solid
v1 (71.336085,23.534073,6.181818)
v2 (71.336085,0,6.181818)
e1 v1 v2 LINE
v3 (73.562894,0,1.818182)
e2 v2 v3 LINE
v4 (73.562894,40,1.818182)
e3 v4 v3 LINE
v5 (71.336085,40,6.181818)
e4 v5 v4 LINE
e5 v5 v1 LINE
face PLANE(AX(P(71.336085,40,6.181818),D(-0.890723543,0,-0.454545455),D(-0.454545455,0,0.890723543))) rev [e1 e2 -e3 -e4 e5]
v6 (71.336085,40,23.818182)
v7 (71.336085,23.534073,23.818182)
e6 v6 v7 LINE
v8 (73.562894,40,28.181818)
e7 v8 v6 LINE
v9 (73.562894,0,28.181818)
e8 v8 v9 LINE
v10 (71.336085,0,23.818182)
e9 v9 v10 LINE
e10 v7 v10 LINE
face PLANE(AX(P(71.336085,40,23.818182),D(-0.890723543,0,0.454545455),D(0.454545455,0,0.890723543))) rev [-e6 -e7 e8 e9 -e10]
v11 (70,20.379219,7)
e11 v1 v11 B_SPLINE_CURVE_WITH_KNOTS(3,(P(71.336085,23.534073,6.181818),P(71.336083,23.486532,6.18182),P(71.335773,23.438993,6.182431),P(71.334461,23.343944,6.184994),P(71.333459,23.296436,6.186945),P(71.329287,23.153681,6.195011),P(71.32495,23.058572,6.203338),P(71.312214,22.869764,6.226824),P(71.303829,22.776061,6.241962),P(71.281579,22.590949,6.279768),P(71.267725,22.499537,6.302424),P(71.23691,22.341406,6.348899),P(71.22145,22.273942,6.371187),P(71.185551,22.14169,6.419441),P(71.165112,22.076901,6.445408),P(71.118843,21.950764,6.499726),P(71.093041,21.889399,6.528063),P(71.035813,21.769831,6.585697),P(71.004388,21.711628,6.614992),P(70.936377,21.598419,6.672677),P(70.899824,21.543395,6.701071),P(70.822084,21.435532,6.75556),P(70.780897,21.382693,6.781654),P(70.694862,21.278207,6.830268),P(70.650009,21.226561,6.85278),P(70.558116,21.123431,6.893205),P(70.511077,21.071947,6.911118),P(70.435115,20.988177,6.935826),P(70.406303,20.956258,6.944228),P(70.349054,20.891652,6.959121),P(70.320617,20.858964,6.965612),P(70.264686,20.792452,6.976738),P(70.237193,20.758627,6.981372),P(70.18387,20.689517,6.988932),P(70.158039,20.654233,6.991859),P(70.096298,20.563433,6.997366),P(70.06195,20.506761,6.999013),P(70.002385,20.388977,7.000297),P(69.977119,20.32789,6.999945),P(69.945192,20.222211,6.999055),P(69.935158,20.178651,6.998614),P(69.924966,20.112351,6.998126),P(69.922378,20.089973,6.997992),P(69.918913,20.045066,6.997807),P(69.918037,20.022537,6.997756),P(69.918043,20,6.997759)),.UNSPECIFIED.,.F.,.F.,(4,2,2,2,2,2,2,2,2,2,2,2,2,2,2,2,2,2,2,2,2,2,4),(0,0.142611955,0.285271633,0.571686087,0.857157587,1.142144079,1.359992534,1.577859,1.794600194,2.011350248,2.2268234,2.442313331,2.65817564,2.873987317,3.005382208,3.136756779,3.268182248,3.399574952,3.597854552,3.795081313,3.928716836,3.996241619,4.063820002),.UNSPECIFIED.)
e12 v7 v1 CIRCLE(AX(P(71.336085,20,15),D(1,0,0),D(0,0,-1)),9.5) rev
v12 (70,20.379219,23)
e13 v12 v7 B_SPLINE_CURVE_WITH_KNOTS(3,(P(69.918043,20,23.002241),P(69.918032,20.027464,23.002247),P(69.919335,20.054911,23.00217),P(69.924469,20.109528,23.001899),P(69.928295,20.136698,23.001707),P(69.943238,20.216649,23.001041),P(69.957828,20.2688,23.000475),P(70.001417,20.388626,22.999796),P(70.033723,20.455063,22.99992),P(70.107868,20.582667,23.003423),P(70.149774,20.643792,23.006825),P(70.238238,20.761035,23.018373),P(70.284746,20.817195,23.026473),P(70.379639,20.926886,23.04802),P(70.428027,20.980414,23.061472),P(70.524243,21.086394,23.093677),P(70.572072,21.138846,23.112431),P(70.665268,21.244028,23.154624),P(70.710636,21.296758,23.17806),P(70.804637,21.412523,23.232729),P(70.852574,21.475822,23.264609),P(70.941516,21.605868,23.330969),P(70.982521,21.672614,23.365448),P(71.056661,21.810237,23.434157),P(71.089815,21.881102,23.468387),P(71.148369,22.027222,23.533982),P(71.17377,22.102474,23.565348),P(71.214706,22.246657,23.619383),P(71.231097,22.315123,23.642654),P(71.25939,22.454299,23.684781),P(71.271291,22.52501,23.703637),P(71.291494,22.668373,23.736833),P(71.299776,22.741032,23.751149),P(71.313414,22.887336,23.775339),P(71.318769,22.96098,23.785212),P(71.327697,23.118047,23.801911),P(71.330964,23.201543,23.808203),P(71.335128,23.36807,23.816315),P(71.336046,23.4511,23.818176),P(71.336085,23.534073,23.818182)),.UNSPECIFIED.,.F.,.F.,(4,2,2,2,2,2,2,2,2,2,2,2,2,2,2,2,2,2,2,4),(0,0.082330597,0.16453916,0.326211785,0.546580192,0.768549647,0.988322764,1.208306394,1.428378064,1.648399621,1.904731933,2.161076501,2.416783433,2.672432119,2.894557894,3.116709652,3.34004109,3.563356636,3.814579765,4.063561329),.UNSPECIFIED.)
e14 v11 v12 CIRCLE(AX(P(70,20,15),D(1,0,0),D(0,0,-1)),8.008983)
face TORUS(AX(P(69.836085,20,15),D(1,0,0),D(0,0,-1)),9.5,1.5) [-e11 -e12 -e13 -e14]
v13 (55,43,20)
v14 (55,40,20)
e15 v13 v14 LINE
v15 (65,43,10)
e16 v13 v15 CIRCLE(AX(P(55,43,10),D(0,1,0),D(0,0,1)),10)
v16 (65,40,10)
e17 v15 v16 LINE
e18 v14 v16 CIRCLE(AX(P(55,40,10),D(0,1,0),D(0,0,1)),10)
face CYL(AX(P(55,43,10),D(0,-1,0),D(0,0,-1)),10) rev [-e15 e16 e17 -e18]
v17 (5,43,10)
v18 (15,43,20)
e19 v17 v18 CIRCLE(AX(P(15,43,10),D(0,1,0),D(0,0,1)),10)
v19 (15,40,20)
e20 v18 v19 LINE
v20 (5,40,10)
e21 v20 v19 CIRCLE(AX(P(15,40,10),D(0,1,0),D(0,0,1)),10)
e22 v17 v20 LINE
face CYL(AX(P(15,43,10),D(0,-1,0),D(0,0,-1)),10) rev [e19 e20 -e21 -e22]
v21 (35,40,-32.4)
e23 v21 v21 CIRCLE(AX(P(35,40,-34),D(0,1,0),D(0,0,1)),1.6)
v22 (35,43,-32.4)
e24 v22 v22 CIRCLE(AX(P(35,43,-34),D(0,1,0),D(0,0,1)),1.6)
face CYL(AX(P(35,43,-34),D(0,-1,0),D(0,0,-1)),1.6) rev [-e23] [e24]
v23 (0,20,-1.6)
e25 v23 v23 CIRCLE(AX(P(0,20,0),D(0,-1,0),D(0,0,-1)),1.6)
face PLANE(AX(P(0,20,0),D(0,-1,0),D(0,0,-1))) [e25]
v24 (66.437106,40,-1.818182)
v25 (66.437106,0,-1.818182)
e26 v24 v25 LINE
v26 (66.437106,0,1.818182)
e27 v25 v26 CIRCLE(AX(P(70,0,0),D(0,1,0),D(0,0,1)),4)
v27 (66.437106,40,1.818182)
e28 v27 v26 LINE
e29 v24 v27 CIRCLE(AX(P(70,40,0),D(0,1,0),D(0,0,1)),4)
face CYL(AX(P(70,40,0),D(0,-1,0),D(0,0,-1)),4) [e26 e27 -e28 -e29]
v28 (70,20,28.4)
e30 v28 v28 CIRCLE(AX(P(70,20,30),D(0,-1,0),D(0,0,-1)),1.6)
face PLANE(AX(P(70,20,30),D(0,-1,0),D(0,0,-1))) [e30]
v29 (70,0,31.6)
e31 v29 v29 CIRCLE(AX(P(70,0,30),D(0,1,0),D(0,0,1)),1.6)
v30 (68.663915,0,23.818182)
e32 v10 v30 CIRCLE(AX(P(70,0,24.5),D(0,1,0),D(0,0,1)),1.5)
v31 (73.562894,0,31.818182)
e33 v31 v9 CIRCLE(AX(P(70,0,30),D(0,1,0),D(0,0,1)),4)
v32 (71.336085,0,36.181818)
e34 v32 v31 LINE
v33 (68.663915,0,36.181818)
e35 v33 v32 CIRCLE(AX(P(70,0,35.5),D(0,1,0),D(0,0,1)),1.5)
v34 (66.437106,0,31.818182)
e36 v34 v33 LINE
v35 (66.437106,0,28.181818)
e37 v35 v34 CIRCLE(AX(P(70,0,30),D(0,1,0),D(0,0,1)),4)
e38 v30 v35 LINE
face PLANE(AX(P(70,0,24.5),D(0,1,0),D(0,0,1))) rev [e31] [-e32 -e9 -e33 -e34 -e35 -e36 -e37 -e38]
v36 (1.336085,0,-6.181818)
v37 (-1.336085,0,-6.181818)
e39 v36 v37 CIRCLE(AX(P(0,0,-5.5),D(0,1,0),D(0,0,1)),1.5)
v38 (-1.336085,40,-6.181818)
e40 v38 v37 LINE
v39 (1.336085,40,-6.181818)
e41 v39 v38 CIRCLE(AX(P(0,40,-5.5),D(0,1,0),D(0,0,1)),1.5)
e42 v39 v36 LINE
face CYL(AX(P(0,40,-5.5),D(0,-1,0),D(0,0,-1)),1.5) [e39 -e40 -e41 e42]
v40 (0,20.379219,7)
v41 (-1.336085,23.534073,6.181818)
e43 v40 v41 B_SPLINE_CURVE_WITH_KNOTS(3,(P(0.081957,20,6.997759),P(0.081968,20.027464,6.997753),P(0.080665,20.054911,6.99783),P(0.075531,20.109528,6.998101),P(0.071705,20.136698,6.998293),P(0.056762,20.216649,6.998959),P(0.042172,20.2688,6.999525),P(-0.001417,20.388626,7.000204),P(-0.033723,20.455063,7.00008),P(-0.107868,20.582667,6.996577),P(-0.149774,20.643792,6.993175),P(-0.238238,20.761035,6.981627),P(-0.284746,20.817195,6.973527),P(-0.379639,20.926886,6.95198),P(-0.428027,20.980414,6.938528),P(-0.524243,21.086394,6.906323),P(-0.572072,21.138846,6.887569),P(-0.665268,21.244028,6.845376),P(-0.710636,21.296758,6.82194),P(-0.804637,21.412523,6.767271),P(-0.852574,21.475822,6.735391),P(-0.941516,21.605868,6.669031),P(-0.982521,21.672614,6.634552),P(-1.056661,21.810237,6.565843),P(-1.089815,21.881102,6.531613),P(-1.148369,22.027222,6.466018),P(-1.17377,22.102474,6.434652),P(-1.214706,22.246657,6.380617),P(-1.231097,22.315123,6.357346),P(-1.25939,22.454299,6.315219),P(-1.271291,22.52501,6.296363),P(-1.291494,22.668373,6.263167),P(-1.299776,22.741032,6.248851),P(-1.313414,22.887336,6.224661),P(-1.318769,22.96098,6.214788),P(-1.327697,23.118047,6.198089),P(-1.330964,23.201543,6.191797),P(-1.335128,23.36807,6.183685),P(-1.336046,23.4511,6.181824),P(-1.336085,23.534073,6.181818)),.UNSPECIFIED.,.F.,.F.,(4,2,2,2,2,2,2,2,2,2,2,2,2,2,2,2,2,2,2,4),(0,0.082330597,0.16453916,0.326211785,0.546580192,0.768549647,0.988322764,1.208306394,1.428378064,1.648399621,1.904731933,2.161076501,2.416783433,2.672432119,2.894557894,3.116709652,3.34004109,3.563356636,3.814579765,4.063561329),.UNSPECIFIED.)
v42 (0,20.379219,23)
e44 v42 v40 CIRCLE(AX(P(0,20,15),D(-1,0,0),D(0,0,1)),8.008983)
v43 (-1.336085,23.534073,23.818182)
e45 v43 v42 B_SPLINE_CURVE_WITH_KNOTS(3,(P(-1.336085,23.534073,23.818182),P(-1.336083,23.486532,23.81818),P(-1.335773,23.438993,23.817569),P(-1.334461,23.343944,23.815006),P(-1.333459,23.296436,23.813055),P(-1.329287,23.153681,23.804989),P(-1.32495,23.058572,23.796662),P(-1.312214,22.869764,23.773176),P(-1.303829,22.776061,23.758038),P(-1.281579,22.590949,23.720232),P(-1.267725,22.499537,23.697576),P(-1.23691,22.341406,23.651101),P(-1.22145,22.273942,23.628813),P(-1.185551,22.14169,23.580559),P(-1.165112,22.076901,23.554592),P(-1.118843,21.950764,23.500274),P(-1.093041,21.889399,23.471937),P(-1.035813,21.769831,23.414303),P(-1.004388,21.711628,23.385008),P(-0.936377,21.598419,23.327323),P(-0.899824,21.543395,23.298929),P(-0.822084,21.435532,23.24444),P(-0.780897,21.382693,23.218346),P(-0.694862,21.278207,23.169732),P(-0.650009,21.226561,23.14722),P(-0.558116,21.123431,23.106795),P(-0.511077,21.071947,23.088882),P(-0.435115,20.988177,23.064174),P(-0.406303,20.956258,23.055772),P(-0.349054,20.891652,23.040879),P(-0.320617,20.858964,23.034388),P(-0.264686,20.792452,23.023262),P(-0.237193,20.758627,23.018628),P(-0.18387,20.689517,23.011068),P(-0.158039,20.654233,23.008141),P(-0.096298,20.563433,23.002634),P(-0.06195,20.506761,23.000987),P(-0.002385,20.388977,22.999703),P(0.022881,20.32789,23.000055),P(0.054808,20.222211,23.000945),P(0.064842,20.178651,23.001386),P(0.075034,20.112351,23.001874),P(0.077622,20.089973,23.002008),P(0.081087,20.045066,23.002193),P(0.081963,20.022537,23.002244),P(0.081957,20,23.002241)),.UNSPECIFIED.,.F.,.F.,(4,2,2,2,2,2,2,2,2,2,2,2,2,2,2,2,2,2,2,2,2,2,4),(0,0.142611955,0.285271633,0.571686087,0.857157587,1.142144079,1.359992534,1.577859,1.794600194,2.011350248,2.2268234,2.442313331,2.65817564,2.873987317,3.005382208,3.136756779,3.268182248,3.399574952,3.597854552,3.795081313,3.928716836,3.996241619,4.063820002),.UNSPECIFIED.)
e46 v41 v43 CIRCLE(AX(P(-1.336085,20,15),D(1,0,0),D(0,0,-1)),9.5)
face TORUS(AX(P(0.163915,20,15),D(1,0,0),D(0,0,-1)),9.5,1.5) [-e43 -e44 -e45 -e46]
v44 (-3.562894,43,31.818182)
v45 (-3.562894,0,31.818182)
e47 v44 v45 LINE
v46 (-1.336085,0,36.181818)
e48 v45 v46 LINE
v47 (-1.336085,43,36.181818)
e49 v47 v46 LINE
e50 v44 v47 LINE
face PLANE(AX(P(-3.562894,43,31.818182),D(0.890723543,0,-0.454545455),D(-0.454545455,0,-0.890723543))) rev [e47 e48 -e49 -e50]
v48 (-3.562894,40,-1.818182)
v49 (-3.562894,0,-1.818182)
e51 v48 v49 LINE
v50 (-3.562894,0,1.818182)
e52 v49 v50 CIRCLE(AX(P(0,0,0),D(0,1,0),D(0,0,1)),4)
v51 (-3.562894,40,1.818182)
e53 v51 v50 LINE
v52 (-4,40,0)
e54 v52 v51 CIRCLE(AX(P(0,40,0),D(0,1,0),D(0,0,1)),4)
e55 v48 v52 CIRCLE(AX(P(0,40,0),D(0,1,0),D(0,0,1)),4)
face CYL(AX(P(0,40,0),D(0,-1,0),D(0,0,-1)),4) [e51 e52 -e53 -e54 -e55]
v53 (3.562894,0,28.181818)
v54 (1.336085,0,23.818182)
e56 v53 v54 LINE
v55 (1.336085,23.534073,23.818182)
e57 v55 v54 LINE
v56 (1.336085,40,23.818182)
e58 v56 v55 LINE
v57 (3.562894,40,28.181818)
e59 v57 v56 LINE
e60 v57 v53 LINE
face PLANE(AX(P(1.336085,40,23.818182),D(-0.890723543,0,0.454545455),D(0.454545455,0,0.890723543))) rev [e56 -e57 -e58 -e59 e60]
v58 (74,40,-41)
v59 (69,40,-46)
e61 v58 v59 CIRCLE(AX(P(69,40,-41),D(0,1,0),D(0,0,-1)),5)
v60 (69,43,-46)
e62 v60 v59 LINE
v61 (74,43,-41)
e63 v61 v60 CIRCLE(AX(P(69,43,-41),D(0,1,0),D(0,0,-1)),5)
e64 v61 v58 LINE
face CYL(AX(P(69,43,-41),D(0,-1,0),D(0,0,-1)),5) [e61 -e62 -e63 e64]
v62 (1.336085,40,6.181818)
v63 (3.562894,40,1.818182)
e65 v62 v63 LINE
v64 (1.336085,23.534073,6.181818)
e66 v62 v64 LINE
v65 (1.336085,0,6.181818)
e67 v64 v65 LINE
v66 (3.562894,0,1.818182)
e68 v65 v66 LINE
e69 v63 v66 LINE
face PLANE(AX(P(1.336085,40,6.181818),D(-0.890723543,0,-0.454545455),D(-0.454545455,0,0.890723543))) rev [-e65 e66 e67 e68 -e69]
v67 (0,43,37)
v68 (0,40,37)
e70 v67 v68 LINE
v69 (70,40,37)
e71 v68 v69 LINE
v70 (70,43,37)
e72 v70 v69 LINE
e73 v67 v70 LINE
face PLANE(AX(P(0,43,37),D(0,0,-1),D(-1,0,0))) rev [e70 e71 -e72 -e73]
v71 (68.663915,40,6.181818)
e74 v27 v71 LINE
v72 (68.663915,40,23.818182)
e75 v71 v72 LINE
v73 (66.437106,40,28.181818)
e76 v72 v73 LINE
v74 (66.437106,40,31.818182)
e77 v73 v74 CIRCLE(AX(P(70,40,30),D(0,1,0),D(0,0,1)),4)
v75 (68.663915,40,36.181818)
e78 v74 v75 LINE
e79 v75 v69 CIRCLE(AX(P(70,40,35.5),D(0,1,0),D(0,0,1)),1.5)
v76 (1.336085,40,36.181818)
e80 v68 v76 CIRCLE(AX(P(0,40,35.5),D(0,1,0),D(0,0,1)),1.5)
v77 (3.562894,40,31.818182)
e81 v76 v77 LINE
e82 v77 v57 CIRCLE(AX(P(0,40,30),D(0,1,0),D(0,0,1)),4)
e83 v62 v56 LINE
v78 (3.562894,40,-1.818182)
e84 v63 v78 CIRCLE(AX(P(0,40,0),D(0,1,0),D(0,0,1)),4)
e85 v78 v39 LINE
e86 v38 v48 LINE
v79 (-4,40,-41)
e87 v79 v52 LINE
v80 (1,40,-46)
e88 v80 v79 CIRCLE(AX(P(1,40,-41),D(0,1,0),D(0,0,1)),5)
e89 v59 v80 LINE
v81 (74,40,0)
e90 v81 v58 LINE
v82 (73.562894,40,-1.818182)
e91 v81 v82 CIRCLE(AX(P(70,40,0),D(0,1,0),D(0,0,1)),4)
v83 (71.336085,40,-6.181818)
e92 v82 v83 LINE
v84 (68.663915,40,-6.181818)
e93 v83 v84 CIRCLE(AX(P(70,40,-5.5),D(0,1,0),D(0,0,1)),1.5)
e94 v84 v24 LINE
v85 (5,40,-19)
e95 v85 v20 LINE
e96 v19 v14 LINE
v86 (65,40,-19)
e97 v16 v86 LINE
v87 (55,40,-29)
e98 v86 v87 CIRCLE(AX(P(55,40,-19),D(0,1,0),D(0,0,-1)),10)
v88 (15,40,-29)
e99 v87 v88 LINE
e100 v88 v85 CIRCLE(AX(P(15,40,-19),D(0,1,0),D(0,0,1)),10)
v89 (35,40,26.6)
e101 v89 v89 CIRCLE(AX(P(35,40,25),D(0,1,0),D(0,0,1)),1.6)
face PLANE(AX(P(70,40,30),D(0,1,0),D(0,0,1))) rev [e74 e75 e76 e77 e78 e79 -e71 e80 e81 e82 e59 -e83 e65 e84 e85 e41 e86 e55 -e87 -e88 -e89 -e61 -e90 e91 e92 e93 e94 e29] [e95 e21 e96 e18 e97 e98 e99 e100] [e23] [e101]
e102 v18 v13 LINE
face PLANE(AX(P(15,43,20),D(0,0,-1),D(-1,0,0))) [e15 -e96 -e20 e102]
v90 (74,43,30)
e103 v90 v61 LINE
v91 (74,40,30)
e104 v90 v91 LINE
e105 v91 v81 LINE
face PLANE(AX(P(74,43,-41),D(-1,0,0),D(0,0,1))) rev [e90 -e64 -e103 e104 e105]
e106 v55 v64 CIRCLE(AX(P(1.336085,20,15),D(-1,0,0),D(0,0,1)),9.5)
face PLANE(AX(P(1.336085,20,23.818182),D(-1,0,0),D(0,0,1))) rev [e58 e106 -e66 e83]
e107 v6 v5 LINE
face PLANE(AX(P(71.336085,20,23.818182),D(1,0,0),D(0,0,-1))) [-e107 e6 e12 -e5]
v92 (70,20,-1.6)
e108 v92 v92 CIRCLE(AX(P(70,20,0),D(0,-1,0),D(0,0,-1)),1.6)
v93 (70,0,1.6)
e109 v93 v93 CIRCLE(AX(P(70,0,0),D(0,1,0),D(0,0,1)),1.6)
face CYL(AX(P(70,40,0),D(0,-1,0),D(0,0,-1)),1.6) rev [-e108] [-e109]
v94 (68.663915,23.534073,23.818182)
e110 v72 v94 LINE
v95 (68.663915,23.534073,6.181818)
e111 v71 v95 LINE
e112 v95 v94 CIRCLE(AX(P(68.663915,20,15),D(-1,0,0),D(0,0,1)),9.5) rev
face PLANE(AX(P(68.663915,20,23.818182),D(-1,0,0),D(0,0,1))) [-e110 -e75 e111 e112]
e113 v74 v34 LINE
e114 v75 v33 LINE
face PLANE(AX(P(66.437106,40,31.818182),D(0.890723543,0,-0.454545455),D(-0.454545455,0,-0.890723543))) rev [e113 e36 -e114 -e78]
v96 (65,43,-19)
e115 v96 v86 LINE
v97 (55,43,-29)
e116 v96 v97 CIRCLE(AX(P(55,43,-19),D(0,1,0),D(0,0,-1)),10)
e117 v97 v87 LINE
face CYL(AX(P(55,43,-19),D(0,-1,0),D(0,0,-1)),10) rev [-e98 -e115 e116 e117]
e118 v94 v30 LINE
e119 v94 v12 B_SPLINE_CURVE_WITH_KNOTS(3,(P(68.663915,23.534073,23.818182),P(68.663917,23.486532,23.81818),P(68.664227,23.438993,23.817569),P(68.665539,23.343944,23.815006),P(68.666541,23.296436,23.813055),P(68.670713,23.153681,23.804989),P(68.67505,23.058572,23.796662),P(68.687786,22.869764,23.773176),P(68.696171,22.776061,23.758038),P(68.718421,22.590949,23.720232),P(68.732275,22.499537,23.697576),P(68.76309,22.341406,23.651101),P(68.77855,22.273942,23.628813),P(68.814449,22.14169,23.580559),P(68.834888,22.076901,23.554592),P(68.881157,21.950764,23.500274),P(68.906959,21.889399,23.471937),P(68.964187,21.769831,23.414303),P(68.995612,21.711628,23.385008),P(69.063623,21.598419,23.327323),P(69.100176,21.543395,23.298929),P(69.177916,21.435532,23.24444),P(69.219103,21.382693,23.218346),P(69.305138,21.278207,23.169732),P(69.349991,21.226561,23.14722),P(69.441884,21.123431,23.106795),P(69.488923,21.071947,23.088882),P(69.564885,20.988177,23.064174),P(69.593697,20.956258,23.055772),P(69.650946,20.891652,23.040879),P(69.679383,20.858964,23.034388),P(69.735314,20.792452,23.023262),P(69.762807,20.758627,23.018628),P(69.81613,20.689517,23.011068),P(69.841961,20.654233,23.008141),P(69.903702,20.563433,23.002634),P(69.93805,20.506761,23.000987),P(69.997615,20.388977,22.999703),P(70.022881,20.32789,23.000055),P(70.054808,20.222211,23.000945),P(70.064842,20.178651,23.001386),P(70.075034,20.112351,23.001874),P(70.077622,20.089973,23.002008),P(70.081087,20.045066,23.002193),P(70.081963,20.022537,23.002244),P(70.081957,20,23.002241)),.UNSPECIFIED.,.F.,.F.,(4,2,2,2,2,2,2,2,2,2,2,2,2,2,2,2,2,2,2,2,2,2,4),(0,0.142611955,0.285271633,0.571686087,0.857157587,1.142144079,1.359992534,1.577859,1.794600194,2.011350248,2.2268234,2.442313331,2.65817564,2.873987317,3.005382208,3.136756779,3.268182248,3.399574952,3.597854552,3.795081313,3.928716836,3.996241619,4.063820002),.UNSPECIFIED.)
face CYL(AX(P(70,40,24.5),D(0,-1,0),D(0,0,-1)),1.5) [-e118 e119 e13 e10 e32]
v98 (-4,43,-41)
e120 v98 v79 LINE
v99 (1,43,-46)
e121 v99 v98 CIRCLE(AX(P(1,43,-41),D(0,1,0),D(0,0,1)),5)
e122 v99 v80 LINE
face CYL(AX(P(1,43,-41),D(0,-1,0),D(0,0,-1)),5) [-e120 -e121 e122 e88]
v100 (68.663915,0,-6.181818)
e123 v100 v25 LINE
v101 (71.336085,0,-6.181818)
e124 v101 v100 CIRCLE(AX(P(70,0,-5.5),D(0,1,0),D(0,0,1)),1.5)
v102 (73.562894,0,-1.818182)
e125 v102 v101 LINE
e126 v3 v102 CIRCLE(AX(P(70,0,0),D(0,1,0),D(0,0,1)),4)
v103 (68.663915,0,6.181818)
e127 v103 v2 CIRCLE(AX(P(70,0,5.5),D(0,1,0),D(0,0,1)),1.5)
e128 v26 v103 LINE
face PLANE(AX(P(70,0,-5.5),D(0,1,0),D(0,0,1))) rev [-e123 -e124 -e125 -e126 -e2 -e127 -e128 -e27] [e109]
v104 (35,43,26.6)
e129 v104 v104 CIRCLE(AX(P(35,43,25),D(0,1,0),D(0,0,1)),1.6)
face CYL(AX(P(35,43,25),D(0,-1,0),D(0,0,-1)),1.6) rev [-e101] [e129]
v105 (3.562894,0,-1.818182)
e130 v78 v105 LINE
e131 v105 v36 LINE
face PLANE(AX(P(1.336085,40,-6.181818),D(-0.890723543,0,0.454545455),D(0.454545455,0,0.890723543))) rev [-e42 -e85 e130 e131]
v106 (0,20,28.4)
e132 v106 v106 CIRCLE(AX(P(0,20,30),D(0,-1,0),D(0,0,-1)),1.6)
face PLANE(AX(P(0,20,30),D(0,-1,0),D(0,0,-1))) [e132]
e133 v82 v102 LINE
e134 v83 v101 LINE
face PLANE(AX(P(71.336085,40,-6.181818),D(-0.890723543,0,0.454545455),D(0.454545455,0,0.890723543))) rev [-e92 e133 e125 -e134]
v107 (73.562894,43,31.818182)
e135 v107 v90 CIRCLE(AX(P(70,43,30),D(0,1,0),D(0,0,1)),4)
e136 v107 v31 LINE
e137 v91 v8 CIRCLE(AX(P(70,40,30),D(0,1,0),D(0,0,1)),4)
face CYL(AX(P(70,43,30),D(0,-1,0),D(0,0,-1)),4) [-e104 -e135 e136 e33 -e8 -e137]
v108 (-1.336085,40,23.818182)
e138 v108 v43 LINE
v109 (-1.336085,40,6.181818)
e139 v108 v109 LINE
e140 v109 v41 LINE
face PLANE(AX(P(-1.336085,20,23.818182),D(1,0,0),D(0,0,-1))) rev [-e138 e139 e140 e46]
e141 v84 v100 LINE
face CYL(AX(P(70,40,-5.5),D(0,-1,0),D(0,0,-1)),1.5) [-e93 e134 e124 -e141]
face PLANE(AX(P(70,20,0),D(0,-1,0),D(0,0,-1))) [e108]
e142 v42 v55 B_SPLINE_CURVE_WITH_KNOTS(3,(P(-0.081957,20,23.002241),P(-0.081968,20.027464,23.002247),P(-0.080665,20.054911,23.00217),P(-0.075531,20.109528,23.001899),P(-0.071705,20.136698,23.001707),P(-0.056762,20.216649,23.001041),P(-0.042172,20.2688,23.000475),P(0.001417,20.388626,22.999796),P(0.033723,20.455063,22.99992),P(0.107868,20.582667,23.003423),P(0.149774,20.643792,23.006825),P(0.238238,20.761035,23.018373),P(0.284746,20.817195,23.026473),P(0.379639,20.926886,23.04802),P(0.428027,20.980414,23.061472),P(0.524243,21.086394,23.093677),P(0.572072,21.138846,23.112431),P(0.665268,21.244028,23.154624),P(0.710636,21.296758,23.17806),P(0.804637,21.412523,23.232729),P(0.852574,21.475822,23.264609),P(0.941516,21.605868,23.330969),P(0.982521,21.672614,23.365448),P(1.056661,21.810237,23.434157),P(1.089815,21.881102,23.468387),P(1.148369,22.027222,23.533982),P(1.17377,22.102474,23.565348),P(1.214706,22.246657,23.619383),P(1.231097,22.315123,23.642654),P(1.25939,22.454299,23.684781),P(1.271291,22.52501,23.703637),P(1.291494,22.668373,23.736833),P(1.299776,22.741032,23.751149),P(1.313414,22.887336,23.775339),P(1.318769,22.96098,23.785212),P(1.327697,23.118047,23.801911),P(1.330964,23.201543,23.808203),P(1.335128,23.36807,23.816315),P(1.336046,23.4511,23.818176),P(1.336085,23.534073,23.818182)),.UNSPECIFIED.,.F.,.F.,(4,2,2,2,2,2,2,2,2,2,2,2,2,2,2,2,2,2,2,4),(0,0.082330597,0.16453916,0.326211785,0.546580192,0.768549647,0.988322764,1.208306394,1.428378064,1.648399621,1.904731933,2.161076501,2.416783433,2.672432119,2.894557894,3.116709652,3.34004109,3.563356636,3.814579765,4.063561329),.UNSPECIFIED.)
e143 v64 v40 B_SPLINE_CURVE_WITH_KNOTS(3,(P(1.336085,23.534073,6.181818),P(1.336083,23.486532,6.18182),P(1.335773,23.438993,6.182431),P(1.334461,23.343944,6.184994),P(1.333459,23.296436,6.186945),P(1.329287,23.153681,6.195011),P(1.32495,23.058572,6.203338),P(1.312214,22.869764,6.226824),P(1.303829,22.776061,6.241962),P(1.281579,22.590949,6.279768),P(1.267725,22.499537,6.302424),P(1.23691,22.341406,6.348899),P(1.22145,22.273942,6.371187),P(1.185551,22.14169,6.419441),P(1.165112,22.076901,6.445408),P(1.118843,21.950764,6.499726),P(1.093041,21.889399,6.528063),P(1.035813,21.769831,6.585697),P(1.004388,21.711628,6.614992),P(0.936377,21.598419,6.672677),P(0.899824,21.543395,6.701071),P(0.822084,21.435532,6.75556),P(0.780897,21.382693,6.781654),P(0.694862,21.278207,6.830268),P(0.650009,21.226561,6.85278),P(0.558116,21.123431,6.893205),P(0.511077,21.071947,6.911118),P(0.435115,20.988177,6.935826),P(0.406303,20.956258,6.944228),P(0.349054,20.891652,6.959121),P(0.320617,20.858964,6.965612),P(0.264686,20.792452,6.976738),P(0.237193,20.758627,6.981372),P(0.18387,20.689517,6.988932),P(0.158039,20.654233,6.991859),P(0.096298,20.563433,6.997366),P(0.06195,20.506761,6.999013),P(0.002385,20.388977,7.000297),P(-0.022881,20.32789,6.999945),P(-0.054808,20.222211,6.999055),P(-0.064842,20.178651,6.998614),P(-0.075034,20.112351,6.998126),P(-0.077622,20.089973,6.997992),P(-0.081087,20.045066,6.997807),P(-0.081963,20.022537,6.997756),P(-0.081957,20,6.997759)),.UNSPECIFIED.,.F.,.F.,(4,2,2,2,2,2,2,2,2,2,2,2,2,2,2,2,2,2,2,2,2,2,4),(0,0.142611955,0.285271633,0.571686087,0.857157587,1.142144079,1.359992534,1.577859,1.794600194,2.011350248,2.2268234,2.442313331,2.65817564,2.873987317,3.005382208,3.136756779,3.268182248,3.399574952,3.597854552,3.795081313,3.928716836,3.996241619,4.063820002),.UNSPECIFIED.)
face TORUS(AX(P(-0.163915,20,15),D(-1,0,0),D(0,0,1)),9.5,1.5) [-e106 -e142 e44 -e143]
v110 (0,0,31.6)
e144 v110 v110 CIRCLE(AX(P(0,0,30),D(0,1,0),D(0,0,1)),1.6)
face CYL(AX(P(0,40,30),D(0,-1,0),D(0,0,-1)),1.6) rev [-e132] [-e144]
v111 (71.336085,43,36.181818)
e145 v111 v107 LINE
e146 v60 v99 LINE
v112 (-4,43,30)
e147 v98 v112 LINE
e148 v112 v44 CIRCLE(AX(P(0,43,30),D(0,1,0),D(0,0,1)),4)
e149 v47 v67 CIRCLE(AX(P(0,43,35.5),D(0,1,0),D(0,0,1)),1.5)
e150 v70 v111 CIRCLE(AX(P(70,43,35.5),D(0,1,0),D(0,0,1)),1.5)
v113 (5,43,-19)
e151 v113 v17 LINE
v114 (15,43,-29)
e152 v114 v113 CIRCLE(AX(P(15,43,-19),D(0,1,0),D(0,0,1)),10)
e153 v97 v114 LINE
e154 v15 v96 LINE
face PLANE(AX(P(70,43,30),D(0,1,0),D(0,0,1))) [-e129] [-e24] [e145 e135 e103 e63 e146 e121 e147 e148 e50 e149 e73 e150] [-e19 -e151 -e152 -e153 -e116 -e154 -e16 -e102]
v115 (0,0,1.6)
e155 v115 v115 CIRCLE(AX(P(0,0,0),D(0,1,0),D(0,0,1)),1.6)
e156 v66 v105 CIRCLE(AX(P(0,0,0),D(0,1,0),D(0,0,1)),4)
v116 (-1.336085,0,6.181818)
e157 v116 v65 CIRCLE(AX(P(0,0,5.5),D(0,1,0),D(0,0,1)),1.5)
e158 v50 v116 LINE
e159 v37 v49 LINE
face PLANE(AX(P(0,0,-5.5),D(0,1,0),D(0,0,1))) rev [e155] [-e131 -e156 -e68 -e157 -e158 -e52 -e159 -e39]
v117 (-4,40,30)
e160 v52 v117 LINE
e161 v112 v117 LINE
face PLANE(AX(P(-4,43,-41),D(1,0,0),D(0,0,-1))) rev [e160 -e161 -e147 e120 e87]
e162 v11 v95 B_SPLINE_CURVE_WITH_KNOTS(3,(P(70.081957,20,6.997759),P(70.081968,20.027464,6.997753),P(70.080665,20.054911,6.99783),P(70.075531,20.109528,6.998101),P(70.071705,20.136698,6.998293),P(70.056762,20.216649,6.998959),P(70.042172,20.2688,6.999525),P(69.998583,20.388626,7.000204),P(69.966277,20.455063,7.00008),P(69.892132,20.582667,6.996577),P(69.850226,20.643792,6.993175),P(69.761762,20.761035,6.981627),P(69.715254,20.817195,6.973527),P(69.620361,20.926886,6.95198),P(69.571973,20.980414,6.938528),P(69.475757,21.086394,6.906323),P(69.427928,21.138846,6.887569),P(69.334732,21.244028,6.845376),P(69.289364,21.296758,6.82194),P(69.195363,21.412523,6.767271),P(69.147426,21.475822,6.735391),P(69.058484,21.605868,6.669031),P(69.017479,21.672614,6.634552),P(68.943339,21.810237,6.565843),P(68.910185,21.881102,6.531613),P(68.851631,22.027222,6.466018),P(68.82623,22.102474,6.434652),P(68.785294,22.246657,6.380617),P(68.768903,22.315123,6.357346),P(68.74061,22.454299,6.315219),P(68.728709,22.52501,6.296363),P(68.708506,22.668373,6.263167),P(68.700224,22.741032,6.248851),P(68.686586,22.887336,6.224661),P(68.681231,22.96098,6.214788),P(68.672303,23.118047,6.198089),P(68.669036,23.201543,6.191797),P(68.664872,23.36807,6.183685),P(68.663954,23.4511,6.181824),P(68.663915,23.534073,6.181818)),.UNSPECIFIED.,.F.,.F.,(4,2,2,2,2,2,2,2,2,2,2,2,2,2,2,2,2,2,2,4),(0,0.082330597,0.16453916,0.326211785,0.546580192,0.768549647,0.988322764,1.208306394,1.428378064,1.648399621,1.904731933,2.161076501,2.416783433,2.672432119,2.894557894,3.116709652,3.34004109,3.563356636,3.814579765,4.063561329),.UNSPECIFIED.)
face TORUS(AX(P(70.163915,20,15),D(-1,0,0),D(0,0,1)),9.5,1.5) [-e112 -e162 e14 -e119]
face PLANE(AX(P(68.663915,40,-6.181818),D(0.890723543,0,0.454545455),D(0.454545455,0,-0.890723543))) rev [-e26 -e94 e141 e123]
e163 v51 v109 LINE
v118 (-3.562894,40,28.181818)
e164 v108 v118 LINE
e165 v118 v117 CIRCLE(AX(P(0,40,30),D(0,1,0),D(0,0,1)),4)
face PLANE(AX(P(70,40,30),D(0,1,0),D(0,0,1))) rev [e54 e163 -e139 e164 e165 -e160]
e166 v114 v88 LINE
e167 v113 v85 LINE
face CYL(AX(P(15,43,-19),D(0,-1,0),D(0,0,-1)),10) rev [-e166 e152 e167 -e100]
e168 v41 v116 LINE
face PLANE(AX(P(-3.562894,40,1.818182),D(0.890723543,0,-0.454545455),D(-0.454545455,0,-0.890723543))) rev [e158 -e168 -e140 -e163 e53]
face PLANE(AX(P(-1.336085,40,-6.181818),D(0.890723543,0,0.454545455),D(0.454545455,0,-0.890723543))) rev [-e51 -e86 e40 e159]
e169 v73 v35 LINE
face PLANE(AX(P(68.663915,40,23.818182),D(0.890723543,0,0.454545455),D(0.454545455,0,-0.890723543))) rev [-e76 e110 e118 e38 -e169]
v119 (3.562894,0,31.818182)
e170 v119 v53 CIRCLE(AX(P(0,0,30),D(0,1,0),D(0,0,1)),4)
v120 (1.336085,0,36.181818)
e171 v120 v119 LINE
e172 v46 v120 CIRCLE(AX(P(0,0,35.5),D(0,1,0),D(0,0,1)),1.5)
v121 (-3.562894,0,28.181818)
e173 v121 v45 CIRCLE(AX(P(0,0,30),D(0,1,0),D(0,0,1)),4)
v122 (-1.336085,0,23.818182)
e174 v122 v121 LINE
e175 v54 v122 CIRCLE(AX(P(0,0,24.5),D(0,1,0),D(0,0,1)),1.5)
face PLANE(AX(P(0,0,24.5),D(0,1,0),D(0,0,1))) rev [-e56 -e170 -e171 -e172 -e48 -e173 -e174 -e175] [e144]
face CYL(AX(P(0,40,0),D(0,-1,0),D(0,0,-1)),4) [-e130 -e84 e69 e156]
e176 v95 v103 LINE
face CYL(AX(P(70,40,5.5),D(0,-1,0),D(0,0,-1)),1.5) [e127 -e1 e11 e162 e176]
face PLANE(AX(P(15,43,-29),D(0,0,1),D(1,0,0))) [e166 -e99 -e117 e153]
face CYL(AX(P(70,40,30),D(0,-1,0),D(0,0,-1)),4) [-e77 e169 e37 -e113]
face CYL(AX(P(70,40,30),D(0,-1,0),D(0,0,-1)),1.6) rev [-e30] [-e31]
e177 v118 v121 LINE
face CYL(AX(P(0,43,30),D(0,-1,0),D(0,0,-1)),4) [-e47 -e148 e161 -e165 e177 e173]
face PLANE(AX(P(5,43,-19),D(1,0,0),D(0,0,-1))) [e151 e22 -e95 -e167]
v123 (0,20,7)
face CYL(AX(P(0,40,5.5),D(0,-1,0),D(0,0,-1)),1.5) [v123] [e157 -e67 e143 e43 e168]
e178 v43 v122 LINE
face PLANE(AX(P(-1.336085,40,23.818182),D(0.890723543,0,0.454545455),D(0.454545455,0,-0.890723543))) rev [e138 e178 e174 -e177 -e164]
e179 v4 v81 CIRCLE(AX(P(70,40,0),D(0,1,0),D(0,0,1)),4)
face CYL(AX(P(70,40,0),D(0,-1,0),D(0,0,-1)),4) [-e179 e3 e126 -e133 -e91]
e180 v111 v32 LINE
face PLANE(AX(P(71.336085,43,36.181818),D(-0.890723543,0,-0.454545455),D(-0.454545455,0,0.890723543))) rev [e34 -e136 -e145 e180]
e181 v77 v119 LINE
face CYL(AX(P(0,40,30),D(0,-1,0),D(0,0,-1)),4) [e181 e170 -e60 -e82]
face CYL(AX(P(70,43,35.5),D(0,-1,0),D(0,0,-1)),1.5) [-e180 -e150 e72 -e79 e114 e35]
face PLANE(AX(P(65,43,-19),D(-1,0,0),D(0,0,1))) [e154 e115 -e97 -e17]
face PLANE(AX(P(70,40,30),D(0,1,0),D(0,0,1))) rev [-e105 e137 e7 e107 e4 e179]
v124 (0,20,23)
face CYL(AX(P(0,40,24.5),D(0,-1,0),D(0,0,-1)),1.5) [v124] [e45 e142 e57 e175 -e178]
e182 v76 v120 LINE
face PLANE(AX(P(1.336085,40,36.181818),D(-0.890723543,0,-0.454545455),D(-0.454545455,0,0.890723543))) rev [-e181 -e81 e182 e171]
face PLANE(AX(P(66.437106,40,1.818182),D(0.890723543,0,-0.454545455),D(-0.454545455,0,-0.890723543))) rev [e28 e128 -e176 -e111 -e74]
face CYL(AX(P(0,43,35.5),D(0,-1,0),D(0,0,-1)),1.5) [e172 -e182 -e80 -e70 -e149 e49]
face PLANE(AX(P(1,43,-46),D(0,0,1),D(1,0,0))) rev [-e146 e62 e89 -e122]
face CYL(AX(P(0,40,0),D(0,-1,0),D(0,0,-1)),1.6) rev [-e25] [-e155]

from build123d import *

# Parameters (mm, degrees)
SKETCH1_R             = 1.6
BOSS_EXTRUDE1_DEPTH   = 40
BOSS_EXTRUDE1_2_DEPTH = 40
BOSS_EXTRUDE1_3_DEPTH = 40
BOSS_EXTRUDE1_4_DEPTH = 40
SKETCH2_R             = 1.6
BOSS_EXTRUDE2_DEPTH   = 3
SKETCH4_W             = 2.672170628
SKETCH4_H             = 17.636363636
BOSS_EXTRUDE3_DEPTH   = 20
SKETCH6_R             = 8
CUT_EXTRUDE2_DEPTH    = 99.18617902
FILLET1_R             = 1.5
BOSS_EXTRUDE4_START   = 20
SKETCH7_R             = 1.6
BOSS_EXTRUDE4_DEPTH   = 20


# Read off the part's stored shape, not the designer's step: Mirror2
with BuildPart() as part:
    # Sketch1 → Boss-Extrude1 (new body)
    with BuildSketch(Plane(origin=(0, 0, 0), x_dir=(1, 0, 0), z_dir=(0, 1, 0))):
        with BuildLine():
            Line((-1.336085314, 6.181818182), (-3.562894171, 1.818181818))
            ThreePointArc((-3.562894171, 1.818181818), (-4, 0), (-3.562894171, -1.818181818))
            Line((-3.562894171, -1.818181818), (-1.336085314, -6.181818182))
            ThreePointArc((-1.336085314, -6.181818182), (0, -7), (1.336085314, -6.181818182))
            Line((1.336085314, -6.181818182), (3.562894171, -1.818181818))
            ThreePointArc((3.562894171, -1.818181818), (4, 0), (3.562894171, 1.818181818))
            Line((3.562894171, 1.818181818), (1.336085314, 6.181818182))
            ThreePointArc((1.336085314, 6.181818182), (0, 7), (-1.336085314, 6.181818182))
        make_face()
        with Locations(Location((0, 0, 0), (0, 0, 270))):
            Circle(SKETCH1_R, mode=Mode.SUBTRACT)
    extrude(amount=BOSS_EXTRUDE1_DEPTH)



with BuildPart() as body_2:
    # Sketch1 → Boss-Extrude1 2 (new body)
    with BuildSketch(Plane(origin=(0, 0, 0), x_dir=(1, 0, 0), z_dir=(0, 1, 0))):
        with BuildLine():
            Line((68.663914686, 6.181818182), (66.437105829, 1.818181818))
            ThreePointArc((66.437105829, 1.818181818), (66, 0), (66.437105829, -1.818181818))
            Line((66.437105829, -1.818181818), (68.663914686, -6.181818182))
            ThreePointArc((68.663914686, -6.181818182), (70, -7), (71.336085314, -6.181818182))
            Line((71.336085314, -6.181818182), (73.562894171, -1.818181818))
            ThreePointArc((73.562894171, -1.818181818), (74, 0), (73.562894171, 1.818181818))
            Line((73.562894171, 1.818181818), (71.336085314, 6.181818182))
            ThreePointArc((71.336085314, 6.181818182), (70, 7), (68.663914686, 6.181818182))
        make_face()
        with Locations(Location((70, 0, 0), (0, 0, 270))):
            Circle(SKETCH1_R, mode=Mode.SUBTRACT)
    extrude(amount=BOSS_EXTRUDE1_2_DEPTH)


with BuildPart() as body_3:
    # Sketch1 → Boss-Extrude1 3 (new body)
    with BuildSketch(Plane(origin=(0, 0, 0), x_dir=(1, 0, 0), z_dir=(0, 1, 0))):
        with BuildLine():
            Line((68.663914686, -23.818181818), (66.437105829, -28.181818182))
            ThreePointArc((66.437105829, -28.181818182), (66, -30), (66.437105829, -31.818181818))
            Line((66.437105829, -31.818181818), (68.663914686, -36.181818182))
            ThreePointArc((68.663914686, -36.181818182), (70, -37), (71.336085314, -36.181818182))
            Line((71.336085314, -36.181818182), (73.562894171, -31.818181818))
            ThreePointArc((73.562894171, -31.818181818), (74, -30), (73.562894171, -28.181818182))
            Line((73.562894171, -28.181818182), (71.336085314, -23.818181818))
            ThreePointArc((71.336085314, -23.818181818), (70, -23), (68.663914686, -23.818181818))
        make_face()
        with Locations(Location((70, -30, 0), (0, 0, 270))):
            Circle(SKETCH1_R, mode=Mode.SUBTRACT)
    extrude(amount=BOSS_EXTRUDE1_3_DEPTH)


with BuildPart() as body_4:
    # Sketch1 → Boss-Extrude1 4 (new body)
    with BuildSketch(Plane(origin=(0, 0, 0), x_dir=(1, 0, 0), z_dir=(0, 1, 0))):
        with BuildLine():
            Line((-1.336085314, -23.818181818), (-3.562894171, -28.181818182))
            ThreePointArc((-3.562894171, -28.181818182), (-4, -30), (-3.562894171, -31.818181818))
            Line((-3.562894171, -31.818181818), (-1.336085314, -36.181818182))
            ThreePointArc((-1.336085314, -36.181818182), (0, -37), (1.336085314, -36.181818182))
            Line((1.336085314, -36.181818182), (3.562894171, -31.818181818))
            ThreePointArc((3.562894171, -31.818181818), (4, -30), (3.562894171, -28.181818182))
            Line((3.562894171, -28.181818182), (1.336085314, -23.818181818))
            ThreePointArc((1.336085314, -23.818181818), (0, -23), (-1.336085314, -23.818181818))
        make_face()
        with Locations(Location((0, -30, 0), (0, 0, 270))):
            Circle(SKETCH1_R, mode=Mode.SUBTRACT)
    extrude(amount=BOSS_EXTRUDE1_4_DEPTH)


with BuildPart() as part_1:
    add(part.part)

    add(body_2.part)  # Boss-Extrude2 merges body 2

    add(body_3.part)  # Boss-Extrude2 merges body 3

    add(body_4.part)  # Boss-Extrude2 merges body 4
    # Sketch2 → Boss-Extrude2 (add)
    with BuildSketch(Plane(origin=(0, 40, 0), x_dir=(1, 0, 0), z_dir=(0, 1, 0))):
        with BuildLine():
            Line((1, 46), (69, 46))
            ThreePointArc((69, 46), (72.535533906, 44.535533906), (74, 41))
            Line((74, 41), (74, -30))
            ThreePointArc((74, -30), (73.889188648, -30.934992865), (73.562894171, -31.818181818))
            Line((73.562894171, -31.818181818), (71.336085314, -36.181818182))
            ThreePointArc((71.336085314, -36.181818182), (70.783349452, -36.779204298), (70, -37))
            Line((70, -37), (0, -37))
            ThreePointArc((0, -37), (-0.783349452, -36.779204298), (-1.336085314, -36.181818182))
            Line((-1.336085314, -36.181818182), (-3.562894171, -31.818181818))
            ThreePointArc((-3.562894171, -31.818181818), (-3.889188648, -30.934992865), (-4, -30))
            Line((-4, -30), (-4, 41))
            ThreePointArc((-4, 41), (-2.535533906, 44.535533906), (1, 46))
        make_face()
        with Locations(Location((35, -25, 0), (0, 0, 270))):
            Circle(SKETCH2_R, mode=Mode.SUBTRACT)
        with Locations(Location((35, 34, 0), (0, 0, 270))):
            Circle(SKETCH2_R, mode=Mode.SUBTRACT)
        with BuildLine():
            Line((15, 29), (55, 29))
            ThreePointArc((55, 29), (62.071067812, 26.071067812), (65, 19))
            Line((65, 19), (65, -10))
            ThreePointArc((65, -10), (62.071067812, -17.071067812), (55, -20))
            Line((55, -20), (15, -20))
            ThreePointArc((15, -20), (7.928932188, -17.071067812), (5, -10))
            Line((5, -10), (5, 19))
            ThreePointArc((5, 19), (7.928932188, 26.071067812), (15, 29))
        make_face(mode=Mode.SUBTRACT)
    extrude(amount=BOSS_EXTRUDE2_DEPTH)

    # Sketch4 → Boss-Extrude3 (add)
    with BuildSketch(Plane.XZ.offset(-40)):
        with Locations((0, 15)):
            Rectangle(SKETCH4_W, SKETCH4_H)
    extrude(amount=BOSS_EXTRUDE3_DEPTH)

    # Sketch6 → Cut-Extrude2 (cut, through all)
    with BuildSketch(Plane.ZY.offset(1.336085314)):
        with Locations((15, 20)):
            Circle(SKETCH6_R)
    extrude(amount=-CUT_EXTRUDE2_DEPTH, mode=Mode.SUBTRACT)

    # Fillet1
    # the kernel refuses this fillet: 1.5 mm, written as the material it takes off along each edge
    with BuildSketch(Plane(origin=(1.336085314, 20, 15), x_dir=(0, -0.45244386791178526, 0.8917928831231068), z_dir=(0, -0.8917928831231068, -0.45244386791178526))) as fillet1_piece_1_section:
        with BuildLine():
            CenterArc((8 + FILLET1_R, FILLET1_R), FILLET1_R, 180, 90)
            Line((8, FILLET1_R), (8, 0))
            Line((8, 0), (8 + FILLET1_R, 0))
        make_face()
    fillet1_piece_1 = revolve(axis=Axis((1.336085314, 20, 15), (-1, 0, 0)), revolution_arc=233.801176838, mode=Mode.PRIVATE)
    fillet1_piece_1 = fillet1_piece_1 - Plane(origin=(0, 21.66747918, 5.5), x_dir=(-0.8907235428302468, 0, 0.45454545454545436), z_dir=(0, -1, 0)) * Cylinder(1.5, 38, mode=Mode.PRIVATE)
    fillet1_piece_1 = fillet1_piece_1 - Plane(origin=(0, 21.66747918, 24.5), x_dir=(0.8907235428302462, 0, -0.4545454545454553), z_dir=(0, -1, 0)) * Cylinder(1.5, 38, mode=Mode.PRIVATE)
    add(fillet1_piece_1, mode=Mode.SUBTRACT)
    with BuildSketch(Plane(origin=(-1.336085314, 20, 15), x_dir=(0, -0.45244386791178526, 0.8917928831231068), z_dir=(0, -0.8917928831231068, -0.45244386791178526))) as fillet1_piece_2_section:
        with BuildLine():
            CenterArc((8 + FILLET1_R, -FILLET1_R), FILLET1_R, 90, 90)
            Line((8, -FILLET1_R), (8, 0))
            Line((8, 0), (8 + FILLET1_R, 0))
        make_face()
    fillet1_piece_2 = revolve(axis=Axis((-1.336085314, 20, 15), (-1, 0, 0)), revolution_arc=233.801176838, mode=Mode.PRIVATE)
    fillet1_piece_2 = fillet1_piece_2 - Plane(origin=(0, 21.66746874, 5.5), x_dir=(-0.8907235428302468, 0, 0.45454545454545436), z_dir=(0, -1, 0)) * Cylinder(1.5, 39, mode=Mode.PRIVATE)
    fillet1_piece_2 = fillet1_piece_2 - Plane(origin=(0, 21.66746874, 24.5), x_dir=(0.8907235428302462, 0, -0.4545454545454553), z_dir=(0, -1, 0)) * Cylinder(1.5, 39, mode=Mode.PRIVATE)
    add(fillet1_piece_2, mode=Mode.SUBTRACT)

    # Sketch7 → Boss-Extrude4 (add)
    with BuildSketch(Plane.XZ.offset(-40).offset(BOSS_EXTRUDE4_START)):
        with Locations(Location((0, 30, 0), (0, 0, 270))):
            Circle(SKETCH7_R)
        with Locations(Location((0, 0, 0), (0, 0, 270))):
            Circle(SKETCH7_R)
        with Locations(Location((70, 0, 0), (0, 0, 270))):
            Circle(SKETCH7_R)
        with Locations(Location((70, 30, 0), (0, 0, 270))):
            Circle(SKETCH7_R)
    extrude(amount=-BOSS_EXTRUDE4_DEPTH)

    # Mirror2: part across plane


with BuildPart() as part_2:
    add(part_1.part)
    add(part_1.part.mirror(Plane.ZY.offset(-35)))


solid = part_2.part
